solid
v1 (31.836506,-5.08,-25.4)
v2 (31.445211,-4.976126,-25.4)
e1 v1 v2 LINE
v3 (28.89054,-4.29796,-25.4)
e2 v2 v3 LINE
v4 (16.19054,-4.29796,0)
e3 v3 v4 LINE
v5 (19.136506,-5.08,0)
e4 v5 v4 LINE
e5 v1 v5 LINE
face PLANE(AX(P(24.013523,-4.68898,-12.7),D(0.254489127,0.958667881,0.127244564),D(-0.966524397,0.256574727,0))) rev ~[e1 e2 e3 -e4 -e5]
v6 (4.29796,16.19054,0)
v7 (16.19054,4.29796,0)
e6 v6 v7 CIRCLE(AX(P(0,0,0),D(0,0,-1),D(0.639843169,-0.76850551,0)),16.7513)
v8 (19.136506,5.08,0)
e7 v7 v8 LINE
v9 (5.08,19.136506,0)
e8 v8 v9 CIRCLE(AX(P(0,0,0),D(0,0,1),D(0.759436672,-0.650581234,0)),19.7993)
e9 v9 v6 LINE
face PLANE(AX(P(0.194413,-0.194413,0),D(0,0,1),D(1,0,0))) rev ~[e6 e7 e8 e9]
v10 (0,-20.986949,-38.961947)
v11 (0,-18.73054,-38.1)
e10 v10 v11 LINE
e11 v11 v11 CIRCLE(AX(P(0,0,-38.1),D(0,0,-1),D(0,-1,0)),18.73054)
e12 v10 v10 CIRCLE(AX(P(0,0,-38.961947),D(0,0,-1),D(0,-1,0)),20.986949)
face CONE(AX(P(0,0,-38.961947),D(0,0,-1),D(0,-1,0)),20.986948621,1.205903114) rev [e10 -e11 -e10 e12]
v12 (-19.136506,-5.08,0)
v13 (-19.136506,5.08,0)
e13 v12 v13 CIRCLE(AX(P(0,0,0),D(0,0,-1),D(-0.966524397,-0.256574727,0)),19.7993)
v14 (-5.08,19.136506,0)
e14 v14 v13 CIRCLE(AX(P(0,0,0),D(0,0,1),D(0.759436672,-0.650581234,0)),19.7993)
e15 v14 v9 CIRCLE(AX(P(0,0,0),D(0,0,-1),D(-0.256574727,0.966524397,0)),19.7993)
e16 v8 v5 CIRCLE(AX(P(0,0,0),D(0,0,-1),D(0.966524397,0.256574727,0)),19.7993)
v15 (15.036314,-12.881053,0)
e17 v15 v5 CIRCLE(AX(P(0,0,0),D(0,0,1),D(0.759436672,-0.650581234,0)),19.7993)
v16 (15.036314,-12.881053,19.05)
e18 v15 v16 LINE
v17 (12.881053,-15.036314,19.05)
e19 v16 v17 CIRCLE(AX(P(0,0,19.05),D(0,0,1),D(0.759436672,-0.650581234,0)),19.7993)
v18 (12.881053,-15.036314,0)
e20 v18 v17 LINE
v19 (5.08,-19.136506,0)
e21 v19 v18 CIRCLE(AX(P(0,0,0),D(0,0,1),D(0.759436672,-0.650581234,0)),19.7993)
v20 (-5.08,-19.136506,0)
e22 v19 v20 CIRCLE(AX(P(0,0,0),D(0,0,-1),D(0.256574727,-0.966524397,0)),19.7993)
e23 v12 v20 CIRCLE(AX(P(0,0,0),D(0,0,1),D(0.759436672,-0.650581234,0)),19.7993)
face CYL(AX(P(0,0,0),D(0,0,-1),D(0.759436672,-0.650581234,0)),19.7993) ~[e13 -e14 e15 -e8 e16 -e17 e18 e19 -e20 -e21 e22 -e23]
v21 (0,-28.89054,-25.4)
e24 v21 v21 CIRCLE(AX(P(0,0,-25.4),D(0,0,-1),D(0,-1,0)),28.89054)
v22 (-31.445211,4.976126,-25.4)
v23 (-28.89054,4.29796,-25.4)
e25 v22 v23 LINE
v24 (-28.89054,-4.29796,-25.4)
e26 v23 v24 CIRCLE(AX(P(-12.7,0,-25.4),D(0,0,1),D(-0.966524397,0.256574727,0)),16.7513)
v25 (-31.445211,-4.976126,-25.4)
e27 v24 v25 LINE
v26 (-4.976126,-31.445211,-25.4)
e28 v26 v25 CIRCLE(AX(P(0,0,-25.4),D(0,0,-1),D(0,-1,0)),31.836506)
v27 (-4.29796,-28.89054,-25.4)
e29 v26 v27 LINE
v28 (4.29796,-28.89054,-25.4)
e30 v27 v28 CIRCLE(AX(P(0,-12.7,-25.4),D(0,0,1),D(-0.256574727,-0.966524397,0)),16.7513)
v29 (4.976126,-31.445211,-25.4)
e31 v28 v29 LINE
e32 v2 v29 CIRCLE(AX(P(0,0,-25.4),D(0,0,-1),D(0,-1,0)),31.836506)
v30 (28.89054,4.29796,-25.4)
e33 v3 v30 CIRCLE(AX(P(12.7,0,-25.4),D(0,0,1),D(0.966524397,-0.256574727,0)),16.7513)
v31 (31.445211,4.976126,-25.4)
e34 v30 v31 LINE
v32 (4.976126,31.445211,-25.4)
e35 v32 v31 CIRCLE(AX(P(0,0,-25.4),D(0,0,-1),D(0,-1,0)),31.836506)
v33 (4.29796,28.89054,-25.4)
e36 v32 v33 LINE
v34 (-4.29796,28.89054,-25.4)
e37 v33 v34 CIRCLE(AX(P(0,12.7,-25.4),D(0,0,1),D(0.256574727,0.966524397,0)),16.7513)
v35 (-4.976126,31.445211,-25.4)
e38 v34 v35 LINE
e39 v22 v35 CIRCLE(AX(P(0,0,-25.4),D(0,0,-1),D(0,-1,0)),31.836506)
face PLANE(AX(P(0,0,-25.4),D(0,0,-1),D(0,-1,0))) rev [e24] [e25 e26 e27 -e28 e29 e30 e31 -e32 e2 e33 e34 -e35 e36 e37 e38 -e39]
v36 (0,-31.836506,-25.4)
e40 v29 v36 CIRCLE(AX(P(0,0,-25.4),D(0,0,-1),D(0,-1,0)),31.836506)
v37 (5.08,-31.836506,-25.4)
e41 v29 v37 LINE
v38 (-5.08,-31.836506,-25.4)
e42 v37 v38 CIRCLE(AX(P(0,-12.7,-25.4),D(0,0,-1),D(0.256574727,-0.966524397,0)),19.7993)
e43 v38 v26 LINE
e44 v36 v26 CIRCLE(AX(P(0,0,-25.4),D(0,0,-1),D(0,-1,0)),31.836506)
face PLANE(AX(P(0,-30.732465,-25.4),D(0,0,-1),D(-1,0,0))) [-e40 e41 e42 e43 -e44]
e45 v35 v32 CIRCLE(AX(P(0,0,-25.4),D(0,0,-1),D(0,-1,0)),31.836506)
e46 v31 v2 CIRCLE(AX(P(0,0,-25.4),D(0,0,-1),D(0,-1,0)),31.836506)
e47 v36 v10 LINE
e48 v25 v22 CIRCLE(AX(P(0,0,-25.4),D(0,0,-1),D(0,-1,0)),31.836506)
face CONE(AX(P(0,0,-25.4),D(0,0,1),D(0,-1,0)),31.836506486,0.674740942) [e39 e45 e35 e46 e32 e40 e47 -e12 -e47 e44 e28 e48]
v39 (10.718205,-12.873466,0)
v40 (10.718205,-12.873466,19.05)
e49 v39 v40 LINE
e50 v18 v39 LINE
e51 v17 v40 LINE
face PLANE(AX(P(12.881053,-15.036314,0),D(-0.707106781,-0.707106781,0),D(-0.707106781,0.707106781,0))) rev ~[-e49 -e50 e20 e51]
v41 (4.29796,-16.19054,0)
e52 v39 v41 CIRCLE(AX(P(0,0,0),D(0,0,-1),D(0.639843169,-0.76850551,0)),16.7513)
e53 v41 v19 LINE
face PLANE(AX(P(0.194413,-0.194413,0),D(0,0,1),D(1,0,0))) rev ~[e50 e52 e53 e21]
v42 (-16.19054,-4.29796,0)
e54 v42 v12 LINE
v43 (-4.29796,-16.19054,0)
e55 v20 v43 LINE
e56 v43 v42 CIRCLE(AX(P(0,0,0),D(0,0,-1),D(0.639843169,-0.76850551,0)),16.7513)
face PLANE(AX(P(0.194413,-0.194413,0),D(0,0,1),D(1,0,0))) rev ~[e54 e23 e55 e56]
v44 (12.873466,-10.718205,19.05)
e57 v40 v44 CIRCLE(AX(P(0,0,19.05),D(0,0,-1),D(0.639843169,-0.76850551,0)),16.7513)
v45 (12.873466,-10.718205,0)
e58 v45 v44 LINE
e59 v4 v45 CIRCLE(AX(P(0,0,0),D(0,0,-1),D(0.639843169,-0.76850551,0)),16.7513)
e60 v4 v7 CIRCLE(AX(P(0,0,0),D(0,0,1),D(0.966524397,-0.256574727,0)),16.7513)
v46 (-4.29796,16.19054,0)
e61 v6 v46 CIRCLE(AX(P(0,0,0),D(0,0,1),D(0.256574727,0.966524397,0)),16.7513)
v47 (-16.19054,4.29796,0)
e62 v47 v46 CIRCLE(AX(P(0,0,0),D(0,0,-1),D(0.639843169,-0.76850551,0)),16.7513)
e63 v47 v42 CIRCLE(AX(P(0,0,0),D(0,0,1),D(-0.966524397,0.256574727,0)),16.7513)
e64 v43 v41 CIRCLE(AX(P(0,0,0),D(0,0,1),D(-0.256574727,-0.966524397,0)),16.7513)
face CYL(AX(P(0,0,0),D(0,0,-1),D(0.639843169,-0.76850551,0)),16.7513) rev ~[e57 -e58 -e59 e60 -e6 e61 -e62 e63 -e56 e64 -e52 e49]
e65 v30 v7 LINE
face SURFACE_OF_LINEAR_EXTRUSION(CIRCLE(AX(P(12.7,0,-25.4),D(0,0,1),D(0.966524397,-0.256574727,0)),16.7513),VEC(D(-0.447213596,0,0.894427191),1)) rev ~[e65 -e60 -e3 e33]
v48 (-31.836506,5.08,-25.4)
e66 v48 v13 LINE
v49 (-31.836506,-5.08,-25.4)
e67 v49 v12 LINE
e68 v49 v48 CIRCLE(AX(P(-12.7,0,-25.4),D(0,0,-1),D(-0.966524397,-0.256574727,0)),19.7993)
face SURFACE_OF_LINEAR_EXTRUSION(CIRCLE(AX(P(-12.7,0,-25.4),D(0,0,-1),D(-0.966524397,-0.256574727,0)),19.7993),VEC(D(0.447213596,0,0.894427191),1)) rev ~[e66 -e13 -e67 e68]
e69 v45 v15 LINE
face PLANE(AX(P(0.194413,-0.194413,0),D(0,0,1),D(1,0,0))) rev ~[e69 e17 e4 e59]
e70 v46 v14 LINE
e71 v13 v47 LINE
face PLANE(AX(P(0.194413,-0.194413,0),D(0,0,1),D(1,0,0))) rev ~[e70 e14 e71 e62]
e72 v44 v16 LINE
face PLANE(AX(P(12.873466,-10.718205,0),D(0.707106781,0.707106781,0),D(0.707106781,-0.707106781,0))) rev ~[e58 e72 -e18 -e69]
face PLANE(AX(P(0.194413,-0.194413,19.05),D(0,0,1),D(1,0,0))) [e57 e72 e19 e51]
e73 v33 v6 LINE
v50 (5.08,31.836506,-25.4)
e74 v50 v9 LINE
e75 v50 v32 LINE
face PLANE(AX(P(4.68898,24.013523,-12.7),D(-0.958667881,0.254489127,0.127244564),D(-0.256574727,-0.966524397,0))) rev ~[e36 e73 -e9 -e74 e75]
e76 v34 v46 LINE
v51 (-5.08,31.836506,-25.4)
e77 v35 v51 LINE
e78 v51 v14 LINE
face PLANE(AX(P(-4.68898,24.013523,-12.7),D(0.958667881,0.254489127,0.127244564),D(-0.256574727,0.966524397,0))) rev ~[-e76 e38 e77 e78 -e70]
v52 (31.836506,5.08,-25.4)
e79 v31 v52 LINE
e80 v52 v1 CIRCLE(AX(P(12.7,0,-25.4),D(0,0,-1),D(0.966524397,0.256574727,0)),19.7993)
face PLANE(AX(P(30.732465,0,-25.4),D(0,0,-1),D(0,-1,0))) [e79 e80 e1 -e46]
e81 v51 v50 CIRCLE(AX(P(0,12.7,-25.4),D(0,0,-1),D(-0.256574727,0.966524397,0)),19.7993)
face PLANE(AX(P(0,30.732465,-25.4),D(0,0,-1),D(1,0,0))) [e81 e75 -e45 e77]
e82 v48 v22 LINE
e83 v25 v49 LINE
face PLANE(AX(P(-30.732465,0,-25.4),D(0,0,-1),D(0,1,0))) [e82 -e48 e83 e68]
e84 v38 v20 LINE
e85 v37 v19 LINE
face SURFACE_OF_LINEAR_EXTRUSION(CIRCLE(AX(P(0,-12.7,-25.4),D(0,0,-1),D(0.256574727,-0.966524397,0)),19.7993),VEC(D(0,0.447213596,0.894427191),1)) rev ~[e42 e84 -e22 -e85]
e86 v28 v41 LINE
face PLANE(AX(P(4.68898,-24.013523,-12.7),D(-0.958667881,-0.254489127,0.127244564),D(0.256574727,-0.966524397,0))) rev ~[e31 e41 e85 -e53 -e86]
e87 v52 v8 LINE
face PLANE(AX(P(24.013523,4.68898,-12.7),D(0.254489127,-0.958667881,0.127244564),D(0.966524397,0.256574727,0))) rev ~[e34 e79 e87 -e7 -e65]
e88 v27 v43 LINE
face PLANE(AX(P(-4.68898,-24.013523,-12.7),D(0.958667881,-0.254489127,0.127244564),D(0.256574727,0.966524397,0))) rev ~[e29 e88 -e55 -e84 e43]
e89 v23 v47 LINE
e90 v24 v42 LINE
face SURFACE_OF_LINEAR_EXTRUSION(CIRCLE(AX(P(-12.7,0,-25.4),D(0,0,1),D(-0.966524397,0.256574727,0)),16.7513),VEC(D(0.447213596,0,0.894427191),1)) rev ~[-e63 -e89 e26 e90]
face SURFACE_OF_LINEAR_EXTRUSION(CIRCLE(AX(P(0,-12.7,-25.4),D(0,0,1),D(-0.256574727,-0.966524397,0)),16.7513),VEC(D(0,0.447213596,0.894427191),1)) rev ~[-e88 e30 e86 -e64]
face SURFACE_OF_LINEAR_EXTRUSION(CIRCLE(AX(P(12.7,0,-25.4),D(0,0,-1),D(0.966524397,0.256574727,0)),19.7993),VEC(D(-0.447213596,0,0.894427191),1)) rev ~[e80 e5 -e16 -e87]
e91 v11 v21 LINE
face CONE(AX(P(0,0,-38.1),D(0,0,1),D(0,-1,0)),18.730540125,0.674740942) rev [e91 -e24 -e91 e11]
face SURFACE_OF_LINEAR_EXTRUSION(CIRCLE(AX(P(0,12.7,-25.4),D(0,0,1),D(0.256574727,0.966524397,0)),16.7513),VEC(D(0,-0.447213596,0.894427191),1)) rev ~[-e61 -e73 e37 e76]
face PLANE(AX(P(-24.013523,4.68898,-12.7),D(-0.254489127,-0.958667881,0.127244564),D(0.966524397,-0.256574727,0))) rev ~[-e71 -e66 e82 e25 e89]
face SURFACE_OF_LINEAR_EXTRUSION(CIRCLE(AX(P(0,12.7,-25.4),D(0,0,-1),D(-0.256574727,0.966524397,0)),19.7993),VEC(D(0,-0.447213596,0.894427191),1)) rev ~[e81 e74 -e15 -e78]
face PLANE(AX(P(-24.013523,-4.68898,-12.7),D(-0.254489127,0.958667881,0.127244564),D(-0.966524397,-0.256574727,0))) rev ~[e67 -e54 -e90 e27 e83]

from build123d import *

# Parameters (mm, degrees)
F1_DEPTH        = 19.05
F4_COPIES_COUNT = 4


# Not quite as in the source:
# - a pattern or mirror of a feature is missing from the dataset's text; its kind, count and spacing are read off the source's solid


with BuildPart() as f1:
    # F0 (on Top) → F1 (new body)
    with BuildSketch(Plane.XY):
        with BuildLine():
            ThreePointArc((10.71820488, -12.8734663491), (-11.8449578237, 11.8449578237), (12.8734663491, -10.71820488))
            Line((12.8734663491, -10.71820488), (15.0363144921, -12.8810530231))
            ThreePointArc((15.0363144921, -12.8810530231), (-14.0002192927, 14.0002192927), (12.8810530231, -15.0363144921))
            Line((12.8810530231, -15.0363144921), (10.71820488, -12.8734663491))
        make_face()
    extrude(amount=F1_DEPTH)

    # F4: sweep along a path in F3
    with BuildLine(Plane.YZ) as f4_path:
        Line((-32.4993, -25.4), (-19.7993, 0))
    # F2 (on face) → F4 (sweep)
    with BuildSketch(Plane(origin=(0, 0, 0), x_dir=(1, 0, 0), z_dir=(0, 0, -1))):
        with BuildLine():
            ThreePointArc((5.08, 19.136506486), (0, 19.7993), (-5.08, 19.136506486))
            Line((-5.08, 19.136506486), (-4.2979602309, 16.1905401251))
            ThreePointArc((-4.2979602309, 16.1905401251), (0, 16.7513), (4.2979602309, 16.1905401251))
            Line((4.2979602309, 16.1905401251), (5.08, 19.136506486))
        make_face()
    f4 = sweep(path=f4_path.line)

    # F4_copies: F4 ×4 about axis
    f4_copies_axis = Axis((0, 0, 0), (0, 0, 1))
    for i in range(1, F4_COPIES_COUNT):
        add(f4.rotate(f4_copies_axis, i * 360 / F4_COPIES_COUNT))

    # F7 (on Right) → F8 (revolve)
    with BuildSketch(Plane.YZ):
        Polygon((-18.7305401251, -38.1), (-28.8905401251, -25.4), (-31.836506486, -25.4), (-20.986948621, -38.9619473312), align=None)
    revolve(axis=Axis((0, 0, -16.1163), (0, 0, -1)))


solid = f1.part
